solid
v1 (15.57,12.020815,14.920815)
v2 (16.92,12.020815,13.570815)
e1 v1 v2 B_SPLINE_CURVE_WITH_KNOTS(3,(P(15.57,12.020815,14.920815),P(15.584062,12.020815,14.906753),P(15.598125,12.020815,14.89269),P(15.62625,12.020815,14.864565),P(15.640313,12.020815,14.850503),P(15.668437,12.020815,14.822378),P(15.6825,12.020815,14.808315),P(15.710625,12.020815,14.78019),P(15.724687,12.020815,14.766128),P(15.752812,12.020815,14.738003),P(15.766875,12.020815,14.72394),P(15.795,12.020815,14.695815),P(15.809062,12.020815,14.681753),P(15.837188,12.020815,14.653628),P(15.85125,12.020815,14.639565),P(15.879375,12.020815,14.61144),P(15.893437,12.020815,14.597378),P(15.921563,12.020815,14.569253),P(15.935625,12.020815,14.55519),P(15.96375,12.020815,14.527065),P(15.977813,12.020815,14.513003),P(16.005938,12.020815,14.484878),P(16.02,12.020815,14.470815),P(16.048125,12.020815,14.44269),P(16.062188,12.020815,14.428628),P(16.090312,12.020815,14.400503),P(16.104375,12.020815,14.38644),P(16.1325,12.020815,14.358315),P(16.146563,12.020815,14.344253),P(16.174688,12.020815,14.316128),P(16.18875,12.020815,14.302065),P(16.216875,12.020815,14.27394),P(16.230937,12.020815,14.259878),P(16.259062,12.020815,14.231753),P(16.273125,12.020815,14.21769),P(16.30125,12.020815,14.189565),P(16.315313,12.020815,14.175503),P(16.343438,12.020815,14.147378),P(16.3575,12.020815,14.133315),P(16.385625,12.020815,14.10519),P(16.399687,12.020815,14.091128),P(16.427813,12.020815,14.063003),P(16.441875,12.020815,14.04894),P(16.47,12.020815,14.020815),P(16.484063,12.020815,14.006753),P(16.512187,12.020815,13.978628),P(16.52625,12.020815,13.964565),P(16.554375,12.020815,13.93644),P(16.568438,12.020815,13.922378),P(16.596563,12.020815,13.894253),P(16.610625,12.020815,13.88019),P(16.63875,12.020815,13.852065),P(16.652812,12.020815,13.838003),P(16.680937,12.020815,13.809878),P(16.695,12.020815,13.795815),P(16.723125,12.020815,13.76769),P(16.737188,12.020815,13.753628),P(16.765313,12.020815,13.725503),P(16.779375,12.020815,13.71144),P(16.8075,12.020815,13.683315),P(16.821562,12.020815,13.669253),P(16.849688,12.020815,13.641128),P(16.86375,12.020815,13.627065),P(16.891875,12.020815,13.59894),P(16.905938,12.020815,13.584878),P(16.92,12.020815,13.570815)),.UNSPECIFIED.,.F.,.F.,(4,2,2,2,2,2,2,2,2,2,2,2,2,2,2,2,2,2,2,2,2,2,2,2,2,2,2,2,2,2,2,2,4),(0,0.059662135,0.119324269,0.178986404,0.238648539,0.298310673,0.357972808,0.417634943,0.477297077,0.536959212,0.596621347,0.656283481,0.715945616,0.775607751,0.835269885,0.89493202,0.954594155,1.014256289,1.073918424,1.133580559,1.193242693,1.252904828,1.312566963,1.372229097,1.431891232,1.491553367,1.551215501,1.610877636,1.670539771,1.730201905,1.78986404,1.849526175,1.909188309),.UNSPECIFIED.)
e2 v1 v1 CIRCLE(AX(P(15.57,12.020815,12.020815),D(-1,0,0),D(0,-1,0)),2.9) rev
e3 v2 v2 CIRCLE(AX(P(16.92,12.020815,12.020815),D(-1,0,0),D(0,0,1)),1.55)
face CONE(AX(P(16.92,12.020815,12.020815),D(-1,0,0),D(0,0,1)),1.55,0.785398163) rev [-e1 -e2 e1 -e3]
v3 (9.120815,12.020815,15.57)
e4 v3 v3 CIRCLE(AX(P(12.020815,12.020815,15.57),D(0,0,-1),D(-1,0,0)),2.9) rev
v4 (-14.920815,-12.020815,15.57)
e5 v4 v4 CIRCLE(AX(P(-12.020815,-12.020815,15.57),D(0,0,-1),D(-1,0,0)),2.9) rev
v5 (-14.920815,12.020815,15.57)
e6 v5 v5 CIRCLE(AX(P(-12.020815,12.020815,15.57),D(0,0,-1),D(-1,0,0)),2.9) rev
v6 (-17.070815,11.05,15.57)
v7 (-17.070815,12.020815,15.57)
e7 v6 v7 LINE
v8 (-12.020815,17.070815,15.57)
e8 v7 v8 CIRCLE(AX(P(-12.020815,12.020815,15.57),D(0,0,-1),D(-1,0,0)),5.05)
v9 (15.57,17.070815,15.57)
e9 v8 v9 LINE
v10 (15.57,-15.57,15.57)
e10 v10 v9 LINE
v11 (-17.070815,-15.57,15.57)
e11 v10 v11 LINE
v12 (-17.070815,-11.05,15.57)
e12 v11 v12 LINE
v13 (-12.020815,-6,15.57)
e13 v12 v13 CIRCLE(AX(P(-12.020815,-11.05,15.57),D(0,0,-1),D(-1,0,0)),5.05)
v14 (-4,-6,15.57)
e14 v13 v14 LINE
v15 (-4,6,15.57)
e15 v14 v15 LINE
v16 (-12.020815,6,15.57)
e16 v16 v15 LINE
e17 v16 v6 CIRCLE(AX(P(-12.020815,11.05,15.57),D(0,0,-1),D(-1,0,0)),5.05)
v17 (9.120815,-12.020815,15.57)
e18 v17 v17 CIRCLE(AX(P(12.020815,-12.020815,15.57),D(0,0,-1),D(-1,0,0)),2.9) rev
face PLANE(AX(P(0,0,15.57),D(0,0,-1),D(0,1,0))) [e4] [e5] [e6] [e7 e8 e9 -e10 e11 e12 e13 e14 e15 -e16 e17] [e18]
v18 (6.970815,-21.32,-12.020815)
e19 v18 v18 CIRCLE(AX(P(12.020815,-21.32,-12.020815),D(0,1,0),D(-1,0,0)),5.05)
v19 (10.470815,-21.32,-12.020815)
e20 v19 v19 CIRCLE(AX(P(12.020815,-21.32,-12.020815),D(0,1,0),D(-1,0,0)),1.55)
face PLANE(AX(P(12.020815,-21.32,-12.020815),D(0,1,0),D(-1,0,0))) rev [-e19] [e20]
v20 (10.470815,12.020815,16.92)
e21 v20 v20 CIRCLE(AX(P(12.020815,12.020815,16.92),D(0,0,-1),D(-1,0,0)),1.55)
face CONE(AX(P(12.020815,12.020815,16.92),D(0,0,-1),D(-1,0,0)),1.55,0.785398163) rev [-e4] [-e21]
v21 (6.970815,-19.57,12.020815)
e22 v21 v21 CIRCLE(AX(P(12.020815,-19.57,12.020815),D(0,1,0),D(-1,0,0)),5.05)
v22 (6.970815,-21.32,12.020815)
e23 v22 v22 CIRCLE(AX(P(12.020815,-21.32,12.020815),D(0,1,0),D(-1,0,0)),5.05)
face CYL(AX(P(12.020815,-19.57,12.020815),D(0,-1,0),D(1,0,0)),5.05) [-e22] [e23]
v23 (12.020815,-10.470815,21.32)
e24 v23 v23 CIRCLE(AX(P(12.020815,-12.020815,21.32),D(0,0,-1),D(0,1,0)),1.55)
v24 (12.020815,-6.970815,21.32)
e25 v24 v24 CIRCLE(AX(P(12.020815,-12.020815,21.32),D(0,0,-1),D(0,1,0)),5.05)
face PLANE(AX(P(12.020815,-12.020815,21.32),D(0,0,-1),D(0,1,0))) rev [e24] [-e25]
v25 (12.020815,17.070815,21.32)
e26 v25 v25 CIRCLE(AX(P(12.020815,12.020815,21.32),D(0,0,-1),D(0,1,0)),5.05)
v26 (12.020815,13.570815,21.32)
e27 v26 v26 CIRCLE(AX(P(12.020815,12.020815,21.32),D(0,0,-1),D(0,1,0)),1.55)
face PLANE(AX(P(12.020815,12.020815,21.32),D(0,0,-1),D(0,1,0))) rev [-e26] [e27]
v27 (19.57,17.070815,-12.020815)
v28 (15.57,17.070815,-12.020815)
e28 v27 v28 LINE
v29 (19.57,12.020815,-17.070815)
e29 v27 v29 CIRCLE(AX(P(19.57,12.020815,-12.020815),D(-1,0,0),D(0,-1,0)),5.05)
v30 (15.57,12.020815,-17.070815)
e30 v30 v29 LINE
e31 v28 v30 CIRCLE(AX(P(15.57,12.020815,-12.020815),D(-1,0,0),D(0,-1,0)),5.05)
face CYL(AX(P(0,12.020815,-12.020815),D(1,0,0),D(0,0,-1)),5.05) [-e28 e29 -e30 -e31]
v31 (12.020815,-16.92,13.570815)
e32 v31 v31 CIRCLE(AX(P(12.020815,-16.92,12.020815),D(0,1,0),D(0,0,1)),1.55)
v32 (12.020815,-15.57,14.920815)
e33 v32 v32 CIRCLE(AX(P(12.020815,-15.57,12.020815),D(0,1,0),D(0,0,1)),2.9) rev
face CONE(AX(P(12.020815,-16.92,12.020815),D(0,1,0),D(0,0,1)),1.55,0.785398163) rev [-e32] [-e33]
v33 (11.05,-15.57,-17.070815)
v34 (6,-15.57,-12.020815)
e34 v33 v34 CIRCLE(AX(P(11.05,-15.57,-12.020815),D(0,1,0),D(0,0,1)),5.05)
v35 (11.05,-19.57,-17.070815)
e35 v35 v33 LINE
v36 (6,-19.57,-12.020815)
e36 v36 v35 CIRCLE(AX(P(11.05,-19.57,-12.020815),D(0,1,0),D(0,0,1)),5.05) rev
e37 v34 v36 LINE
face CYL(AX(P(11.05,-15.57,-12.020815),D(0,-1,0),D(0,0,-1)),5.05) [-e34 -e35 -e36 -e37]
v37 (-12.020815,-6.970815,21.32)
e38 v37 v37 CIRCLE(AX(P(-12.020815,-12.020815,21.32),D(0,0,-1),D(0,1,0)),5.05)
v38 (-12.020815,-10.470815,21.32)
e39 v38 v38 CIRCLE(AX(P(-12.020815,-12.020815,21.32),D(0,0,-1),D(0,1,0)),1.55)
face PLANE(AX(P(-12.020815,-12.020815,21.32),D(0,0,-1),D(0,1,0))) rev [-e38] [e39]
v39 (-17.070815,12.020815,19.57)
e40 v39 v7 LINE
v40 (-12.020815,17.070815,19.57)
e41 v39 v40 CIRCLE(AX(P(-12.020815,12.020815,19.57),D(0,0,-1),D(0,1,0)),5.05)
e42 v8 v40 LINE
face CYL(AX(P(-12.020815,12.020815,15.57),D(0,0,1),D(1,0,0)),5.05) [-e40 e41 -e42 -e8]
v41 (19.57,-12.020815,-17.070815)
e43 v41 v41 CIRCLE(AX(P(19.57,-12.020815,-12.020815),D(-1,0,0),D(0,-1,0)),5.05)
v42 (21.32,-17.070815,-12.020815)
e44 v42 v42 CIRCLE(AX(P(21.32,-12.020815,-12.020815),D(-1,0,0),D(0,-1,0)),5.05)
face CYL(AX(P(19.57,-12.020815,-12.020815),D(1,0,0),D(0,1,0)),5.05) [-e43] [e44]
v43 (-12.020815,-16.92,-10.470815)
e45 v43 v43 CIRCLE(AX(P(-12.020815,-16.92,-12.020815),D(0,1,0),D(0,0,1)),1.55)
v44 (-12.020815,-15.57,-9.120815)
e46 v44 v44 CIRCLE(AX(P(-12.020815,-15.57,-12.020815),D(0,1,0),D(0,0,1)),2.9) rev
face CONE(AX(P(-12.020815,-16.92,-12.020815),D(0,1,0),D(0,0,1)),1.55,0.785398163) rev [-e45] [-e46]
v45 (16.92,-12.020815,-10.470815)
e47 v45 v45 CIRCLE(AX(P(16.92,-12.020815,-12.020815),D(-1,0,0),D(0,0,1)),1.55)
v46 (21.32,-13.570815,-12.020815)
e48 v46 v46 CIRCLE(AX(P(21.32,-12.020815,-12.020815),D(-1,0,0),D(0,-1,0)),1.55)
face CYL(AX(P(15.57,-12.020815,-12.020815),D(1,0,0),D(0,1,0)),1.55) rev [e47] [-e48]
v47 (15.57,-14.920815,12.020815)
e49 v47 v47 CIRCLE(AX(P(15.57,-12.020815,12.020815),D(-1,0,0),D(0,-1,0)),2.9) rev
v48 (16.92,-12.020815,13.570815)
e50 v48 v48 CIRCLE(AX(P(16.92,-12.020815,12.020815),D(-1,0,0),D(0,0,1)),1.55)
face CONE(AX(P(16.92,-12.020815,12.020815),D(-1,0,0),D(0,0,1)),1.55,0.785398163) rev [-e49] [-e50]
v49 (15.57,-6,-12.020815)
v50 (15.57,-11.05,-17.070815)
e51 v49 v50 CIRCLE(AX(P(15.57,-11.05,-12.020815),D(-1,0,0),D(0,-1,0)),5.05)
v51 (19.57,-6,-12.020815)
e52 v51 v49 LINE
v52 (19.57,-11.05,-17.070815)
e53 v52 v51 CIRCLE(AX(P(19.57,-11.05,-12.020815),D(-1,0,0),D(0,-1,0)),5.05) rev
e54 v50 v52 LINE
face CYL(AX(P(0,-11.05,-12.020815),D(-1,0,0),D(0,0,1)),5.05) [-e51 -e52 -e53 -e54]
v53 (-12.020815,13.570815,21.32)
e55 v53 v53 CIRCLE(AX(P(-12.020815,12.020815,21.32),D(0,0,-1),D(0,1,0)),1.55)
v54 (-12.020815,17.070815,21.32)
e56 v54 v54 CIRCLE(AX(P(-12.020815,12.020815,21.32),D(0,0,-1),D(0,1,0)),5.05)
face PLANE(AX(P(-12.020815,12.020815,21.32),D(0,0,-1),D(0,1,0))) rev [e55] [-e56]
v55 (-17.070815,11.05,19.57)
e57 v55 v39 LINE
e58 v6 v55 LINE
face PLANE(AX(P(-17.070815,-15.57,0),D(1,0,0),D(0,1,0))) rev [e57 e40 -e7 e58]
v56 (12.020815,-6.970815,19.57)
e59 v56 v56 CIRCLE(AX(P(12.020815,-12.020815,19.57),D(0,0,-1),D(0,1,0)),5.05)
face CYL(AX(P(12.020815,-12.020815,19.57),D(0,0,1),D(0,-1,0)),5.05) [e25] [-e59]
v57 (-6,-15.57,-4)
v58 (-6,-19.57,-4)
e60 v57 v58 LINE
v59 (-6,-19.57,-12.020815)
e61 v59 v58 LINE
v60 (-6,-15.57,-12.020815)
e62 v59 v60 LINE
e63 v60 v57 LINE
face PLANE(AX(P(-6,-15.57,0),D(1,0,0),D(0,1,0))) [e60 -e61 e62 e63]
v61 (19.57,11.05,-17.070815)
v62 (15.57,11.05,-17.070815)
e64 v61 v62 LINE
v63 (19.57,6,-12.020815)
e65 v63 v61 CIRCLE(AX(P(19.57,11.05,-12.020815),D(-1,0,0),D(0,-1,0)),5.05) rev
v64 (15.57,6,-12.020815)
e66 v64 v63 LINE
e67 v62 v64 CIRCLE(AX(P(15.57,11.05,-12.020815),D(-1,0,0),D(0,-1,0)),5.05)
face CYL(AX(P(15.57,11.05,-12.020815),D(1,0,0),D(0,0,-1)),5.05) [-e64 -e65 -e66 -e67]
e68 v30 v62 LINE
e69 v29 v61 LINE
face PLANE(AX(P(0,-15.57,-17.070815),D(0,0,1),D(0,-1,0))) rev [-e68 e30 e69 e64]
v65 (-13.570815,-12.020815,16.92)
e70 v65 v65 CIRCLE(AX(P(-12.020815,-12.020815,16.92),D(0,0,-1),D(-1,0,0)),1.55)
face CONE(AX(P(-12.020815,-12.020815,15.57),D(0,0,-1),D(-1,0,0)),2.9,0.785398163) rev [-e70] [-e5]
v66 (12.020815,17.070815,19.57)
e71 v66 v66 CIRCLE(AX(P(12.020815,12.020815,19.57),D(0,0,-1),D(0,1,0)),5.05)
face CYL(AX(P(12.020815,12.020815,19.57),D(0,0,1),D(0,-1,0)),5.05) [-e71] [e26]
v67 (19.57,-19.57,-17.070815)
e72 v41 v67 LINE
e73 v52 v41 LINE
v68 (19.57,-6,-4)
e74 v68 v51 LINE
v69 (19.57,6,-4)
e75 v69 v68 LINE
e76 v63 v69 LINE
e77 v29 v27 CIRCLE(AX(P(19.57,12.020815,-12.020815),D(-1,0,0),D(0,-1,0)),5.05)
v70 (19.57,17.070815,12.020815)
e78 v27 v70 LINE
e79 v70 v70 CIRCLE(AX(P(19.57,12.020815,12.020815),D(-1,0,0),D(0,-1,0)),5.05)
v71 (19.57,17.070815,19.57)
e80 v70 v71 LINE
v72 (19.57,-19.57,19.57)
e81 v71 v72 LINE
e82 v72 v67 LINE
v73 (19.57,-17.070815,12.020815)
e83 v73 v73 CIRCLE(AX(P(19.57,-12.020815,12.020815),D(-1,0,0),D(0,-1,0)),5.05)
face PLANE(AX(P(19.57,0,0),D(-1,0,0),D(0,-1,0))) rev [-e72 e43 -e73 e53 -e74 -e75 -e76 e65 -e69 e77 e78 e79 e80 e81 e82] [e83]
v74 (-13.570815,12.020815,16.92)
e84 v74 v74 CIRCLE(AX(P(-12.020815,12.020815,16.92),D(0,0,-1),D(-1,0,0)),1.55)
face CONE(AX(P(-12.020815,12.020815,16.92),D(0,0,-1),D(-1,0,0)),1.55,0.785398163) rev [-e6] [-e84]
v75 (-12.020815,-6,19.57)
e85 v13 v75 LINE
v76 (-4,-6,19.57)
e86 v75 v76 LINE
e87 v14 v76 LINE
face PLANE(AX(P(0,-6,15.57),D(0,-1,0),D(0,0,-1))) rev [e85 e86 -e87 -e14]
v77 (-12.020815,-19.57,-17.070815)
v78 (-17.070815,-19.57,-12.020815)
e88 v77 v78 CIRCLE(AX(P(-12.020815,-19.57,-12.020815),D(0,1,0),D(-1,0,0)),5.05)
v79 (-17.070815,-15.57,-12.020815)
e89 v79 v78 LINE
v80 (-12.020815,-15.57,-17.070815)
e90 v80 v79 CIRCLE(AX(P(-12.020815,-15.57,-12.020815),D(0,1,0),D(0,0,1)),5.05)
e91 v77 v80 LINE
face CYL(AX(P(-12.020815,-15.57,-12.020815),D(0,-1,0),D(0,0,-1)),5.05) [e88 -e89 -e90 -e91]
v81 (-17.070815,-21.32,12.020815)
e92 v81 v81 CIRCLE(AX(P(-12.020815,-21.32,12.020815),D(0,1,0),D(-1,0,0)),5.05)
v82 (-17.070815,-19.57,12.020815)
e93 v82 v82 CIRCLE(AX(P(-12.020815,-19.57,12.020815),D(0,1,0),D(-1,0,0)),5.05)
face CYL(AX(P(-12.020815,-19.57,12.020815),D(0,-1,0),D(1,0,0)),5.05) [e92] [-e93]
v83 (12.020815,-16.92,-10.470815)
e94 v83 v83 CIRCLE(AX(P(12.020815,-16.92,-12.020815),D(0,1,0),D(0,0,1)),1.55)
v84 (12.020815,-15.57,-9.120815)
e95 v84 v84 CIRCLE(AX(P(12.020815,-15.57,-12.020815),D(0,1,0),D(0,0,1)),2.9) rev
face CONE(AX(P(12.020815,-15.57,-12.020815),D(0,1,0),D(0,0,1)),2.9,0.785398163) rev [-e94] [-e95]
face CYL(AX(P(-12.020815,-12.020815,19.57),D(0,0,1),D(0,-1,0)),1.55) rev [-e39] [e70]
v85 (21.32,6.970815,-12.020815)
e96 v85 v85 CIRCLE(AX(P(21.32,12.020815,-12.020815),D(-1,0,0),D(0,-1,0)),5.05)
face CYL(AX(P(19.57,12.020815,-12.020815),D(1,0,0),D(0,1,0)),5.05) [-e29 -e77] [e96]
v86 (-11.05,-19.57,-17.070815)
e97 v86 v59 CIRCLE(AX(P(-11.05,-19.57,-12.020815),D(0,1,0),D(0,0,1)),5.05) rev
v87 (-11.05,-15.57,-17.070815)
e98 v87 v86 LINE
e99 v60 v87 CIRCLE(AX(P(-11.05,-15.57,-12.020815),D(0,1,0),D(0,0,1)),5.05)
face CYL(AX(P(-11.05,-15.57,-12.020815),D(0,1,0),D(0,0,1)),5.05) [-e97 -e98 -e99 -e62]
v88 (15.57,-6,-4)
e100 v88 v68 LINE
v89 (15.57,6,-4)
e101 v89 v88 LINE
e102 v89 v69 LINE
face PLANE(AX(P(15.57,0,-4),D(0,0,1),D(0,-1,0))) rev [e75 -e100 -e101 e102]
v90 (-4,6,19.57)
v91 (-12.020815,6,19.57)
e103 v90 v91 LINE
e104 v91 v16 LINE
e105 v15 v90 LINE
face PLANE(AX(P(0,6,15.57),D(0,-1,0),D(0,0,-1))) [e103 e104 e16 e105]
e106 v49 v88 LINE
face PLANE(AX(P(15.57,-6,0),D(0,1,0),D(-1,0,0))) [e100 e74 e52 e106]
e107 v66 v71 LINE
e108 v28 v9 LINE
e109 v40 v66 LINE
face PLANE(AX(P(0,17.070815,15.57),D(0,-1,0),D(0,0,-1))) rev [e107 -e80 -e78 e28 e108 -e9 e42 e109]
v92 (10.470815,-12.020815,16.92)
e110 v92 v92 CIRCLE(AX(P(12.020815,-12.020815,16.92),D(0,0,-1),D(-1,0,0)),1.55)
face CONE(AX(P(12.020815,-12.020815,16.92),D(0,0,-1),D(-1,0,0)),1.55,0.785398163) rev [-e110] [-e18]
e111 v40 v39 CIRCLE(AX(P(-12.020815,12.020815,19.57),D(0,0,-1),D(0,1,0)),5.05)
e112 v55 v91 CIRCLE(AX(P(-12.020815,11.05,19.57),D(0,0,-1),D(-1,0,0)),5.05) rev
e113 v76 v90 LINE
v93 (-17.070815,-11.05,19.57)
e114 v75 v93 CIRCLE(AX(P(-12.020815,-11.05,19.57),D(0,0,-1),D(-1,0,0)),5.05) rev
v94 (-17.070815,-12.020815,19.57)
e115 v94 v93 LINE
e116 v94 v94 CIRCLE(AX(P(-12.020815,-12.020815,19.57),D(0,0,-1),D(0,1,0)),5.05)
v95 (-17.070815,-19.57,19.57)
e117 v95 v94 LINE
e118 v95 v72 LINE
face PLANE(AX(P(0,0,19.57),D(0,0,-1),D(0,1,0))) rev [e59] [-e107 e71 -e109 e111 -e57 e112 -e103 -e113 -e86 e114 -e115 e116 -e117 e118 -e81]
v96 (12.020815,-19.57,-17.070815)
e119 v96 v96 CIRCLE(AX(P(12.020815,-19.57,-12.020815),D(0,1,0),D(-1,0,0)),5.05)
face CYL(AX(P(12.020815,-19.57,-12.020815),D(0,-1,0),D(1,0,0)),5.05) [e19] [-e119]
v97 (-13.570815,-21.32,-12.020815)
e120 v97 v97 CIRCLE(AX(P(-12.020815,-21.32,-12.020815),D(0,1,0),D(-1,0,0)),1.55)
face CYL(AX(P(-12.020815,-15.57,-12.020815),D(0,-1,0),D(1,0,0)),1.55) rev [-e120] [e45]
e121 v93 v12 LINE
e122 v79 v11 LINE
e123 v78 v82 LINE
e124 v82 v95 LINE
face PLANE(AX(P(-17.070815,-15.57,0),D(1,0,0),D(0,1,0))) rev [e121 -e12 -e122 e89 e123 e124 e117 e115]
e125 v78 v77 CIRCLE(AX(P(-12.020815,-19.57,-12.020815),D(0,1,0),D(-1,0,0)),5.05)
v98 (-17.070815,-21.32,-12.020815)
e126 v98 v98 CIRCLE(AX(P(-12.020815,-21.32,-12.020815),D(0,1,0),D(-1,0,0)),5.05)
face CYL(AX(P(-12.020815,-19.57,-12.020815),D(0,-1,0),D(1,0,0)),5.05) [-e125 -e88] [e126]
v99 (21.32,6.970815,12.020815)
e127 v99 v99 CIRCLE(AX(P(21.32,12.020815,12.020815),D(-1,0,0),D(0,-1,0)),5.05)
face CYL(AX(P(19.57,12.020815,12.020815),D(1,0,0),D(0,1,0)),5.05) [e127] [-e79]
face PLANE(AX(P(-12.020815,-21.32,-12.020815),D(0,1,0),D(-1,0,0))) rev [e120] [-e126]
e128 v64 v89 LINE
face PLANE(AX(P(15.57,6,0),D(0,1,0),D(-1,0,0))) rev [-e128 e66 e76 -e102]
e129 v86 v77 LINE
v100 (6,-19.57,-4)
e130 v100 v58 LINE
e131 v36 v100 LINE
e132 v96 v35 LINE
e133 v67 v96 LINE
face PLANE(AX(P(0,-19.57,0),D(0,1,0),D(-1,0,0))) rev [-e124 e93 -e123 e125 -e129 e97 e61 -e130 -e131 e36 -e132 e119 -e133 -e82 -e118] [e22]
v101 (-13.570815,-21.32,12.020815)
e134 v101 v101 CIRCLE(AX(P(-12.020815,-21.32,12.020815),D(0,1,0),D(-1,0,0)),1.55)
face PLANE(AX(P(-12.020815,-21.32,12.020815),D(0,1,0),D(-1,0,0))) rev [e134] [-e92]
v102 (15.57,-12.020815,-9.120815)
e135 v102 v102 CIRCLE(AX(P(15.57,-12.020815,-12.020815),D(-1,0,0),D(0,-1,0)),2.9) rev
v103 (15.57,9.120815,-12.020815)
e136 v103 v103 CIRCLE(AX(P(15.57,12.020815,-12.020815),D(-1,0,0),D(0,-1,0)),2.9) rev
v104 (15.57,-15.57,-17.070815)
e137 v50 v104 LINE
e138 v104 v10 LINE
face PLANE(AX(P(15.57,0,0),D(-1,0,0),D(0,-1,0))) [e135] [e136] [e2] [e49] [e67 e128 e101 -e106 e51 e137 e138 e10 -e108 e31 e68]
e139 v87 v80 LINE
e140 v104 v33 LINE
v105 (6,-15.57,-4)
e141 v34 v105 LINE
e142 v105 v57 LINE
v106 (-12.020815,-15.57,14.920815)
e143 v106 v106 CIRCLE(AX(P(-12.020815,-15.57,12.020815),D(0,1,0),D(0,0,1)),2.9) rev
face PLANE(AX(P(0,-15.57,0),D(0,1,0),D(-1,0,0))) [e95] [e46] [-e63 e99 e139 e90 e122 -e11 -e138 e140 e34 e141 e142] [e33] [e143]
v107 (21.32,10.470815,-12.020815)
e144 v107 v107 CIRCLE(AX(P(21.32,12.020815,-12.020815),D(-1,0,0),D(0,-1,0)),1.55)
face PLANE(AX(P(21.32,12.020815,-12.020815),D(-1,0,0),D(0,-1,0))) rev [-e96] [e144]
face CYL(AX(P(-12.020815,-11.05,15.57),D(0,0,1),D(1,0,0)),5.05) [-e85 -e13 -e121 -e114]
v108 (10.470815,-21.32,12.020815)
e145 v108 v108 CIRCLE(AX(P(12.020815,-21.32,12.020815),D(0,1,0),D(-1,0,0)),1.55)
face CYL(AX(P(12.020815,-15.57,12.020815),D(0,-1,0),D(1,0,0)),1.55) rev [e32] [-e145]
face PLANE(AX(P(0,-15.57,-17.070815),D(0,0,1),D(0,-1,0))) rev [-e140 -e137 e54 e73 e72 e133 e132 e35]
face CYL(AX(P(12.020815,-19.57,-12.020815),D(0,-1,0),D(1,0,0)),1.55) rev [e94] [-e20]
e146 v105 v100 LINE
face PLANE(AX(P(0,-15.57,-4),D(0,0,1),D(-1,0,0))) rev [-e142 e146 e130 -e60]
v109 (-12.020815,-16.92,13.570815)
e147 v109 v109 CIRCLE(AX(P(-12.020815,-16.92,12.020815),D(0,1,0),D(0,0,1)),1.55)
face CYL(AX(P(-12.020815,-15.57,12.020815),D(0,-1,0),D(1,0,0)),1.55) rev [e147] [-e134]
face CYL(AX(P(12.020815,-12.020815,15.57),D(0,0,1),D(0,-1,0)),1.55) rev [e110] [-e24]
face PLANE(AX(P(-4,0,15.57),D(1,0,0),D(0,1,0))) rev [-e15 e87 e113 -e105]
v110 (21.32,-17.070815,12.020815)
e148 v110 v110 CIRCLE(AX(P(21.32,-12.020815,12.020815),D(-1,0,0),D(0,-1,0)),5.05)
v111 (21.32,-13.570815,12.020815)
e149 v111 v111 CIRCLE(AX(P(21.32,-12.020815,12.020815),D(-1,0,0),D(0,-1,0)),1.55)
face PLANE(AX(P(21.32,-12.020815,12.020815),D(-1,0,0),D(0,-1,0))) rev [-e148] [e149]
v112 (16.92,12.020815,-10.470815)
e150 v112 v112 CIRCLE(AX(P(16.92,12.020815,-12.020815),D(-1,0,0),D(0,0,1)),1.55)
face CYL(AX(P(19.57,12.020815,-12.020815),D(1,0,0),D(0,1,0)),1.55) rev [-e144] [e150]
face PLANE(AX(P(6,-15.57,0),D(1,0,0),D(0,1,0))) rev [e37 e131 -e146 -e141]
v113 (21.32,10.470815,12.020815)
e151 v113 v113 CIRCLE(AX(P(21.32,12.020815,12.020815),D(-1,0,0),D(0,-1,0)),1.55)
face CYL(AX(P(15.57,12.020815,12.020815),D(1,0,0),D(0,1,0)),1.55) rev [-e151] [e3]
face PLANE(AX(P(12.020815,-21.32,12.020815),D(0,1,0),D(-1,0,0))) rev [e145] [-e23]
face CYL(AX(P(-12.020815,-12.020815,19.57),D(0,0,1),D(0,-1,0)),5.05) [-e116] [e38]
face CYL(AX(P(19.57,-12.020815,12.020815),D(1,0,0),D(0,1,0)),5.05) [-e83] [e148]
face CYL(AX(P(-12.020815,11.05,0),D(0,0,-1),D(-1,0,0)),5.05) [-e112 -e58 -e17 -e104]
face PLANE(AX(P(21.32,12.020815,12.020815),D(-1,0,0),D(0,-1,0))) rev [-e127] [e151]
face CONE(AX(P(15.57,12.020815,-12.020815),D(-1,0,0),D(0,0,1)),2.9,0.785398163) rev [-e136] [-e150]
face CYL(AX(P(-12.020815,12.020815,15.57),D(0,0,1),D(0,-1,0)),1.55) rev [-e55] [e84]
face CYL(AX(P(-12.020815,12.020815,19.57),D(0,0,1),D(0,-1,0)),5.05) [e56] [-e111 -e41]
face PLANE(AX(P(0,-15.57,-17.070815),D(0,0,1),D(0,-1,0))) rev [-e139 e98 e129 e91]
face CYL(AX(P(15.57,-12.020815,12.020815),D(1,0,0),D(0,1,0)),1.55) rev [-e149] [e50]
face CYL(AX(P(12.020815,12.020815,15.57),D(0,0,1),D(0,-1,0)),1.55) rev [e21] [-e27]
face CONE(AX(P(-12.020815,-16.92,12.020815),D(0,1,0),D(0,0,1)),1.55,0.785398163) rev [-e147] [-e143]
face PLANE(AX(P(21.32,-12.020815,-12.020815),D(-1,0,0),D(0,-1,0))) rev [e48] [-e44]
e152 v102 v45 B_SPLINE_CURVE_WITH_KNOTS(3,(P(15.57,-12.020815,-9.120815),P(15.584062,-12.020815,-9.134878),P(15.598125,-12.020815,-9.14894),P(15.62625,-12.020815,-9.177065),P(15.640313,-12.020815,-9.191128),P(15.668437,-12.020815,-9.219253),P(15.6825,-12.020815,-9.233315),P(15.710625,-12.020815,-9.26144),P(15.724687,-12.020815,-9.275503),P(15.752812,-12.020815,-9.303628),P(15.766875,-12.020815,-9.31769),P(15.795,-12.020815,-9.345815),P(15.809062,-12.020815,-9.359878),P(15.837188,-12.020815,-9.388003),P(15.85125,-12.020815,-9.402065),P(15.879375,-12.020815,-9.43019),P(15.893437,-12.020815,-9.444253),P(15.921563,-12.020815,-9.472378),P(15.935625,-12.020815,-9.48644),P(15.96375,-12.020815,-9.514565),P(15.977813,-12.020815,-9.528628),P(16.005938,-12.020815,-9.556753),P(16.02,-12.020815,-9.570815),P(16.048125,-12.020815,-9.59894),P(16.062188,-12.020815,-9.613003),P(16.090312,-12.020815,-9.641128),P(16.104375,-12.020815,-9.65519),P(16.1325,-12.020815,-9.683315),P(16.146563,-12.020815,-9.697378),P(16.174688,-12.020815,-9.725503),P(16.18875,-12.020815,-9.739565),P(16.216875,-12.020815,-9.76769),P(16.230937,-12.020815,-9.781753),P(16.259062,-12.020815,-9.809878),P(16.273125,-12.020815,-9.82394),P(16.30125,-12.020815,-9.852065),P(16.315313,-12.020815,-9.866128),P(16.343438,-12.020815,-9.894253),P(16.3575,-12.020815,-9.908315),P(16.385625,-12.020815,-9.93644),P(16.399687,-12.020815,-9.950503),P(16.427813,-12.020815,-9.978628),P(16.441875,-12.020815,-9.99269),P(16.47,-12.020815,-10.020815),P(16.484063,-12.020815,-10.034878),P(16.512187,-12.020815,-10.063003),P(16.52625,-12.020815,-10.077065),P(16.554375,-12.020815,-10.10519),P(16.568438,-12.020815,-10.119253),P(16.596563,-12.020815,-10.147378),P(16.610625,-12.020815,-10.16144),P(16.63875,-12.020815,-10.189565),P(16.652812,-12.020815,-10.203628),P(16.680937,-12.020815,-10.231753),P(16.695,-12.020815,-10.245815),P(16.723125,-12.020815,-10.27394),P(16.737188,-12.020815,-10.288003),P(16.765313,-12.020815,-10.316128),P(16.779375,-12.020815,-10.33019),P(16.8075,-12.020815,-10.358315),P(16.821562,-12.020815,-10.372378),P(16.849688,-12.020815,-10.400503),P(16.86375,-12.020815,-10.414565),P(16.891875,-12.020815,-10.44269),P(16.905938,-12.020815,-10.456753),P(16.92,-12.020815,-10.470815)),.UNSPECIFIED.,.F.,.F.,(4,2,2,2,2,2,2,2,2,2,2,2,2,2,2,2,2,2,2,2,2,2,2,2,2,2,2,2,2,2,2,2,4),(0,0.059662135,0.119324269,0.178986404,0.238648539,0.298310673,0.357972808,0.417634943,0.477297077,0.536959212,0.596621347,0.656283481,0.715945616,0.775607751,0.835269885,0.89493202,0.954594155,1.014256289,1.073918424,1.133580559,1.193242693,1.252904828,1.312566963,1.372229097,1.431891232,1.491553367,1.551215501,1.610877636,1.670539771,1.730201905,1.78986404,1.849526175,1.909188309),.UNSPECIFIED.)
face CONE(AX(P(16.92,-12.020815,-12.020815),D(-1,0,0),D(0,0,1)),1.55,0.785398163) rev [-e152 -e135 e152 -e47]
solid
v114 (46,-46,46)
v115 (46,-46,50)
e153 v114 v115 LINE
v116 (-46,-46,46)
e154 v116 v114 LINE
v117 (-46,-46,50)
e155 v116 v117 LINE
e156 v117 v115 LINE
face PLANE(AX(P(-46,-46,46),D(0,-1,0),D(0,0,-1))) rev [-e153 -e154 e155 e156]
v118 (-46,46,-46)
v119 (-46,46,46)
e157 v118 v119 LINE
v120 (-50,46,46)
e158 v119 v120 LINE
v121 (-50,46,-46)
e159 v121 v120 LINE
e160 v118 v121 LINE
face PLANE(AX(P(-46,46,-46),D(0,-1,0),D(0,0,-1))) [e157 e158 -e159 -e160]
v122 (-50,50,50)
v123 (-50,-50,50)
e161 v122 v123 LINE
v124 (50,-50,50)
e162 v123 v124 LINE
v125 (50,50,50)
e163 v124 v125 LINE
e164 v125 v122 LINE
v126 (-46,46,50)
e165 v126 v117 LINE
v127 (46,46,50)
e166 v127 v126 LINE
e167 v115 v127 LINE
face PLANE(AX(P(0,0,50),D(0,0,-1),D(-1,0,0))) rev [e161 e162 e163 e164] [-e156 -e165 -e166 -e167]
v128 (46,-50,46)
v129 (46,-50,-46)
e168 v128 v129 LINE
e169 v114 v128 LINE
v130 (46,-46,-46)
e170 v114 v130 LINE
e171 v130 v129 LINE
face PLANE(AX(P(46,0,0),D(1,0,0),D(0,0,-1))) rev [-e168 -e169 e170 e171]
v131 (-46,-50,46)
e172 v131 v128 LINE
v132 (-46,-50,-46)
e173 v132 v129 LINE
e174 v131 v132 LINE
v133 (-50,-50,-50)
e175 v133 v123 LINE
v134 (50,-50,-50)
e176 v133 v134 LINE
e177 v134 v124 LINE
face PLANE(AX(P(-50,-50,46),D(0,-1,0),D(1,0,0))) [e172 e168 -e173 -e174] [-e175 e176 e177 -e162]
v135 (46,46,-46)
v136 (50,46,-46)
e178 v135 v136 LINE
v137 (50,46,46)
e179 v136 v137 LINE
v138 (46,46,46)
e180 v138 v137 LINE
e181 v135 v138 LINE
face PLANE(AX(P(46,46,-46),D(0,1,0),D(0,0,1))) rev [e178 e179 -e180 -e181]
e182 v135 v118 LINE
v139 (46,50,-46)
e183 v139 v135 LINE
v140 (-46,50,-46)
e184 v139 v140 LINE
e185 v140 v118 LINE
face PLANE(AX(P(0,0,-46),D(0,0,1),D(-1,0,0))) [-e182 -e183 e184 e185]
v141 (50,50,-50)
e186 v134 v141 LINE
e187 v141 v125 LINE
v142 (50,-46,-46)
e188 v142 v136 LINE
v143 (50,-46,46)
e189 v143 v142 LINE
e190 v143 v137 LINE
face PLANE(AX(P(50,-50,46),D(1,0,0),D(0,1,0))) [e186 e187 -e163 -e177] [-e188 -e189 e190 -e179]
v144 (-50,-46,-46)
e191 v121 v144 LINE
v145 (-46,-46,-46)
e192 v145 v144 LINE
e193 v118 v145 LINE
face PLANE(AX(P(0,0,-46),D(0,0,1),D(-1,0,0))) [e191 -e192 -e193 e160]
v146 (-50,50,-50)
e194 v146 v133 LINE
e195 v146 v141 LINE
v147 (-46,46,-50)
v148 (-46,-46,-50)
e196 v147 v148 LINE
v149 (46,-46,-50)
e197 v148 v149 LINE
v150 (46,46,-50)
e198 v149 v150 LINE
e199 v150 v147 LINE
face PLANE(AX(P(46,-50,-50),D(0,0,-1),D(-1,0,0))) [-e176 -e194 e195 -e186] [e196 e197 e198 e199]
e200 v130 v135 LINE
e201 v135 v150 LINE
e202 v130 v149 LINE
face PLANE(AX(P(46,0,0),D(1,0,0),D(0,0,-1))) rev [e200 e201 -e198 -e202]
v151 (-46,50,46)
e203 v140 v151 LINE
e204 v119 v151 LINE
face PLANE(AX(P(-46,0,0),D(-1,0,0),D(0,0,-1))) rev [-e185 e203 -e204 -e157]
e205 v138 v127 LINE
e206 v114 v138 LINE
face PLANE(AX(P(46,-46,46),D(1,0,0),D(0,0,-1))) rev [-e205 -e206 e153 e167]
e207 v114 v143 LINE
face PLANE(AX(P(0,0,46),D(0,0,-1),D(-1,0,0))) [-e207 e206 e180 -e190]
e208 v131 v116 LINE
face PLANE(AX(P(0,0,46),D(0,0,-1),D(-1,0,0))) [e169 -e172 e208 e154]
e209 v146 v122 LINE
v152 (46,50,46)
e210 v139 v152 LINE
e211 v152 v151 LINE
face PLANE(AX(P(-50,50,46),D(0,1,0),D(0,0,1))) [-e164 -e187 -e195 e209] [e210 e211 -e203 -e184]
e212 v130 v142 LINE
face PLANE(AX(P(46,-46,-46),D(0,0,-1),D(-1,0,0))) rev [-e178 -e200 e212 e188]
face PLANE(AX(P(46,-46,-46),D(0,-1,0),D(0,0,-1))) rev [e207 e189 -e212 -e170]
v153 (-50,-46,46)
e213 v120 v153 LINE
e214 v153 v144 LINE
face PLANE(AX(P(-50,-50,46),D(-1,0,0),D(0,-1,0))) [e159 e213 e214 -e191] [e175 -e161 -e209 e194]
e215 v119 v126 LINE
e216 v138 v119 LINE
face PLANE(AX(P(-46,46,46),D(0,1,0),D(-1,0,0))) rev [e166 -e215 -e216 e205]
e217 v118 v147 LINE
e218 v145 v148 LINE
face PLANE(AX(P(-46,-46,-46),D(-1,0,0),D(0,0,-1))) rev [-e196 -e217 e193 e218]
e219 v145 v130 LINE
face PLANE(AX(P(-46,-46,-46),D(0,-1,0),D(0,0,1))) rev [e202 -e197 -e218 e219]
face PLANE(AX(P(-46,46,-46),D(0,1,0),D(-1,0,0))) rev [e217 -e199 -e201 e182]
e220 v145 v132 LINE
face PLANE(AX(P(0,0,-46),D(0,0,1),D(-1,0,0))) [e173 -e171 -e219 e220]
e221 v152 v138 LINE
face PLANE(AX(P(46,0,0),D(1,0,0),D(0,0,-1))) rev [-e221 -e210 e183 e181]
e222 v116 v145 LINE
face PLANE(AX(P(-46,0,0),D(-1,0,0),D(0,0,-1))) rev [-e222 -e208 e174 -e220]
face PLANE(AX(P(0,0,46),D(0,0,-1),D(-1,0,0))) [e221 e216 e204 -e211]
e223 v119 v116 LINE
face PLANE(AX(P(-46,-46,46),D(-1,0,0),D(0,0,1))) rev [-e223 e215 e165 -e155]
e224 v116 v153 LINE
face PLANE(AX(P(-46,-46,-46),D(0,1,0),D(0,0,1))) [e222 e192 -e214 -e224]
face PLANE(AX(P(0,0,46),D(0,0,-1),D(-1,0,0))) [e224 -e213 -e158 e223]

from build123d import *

# Parameters (mm, degrees)
SKETCH1_W              = 100
SKETCH1_H              = 100
SKETCH1_W_2            = 92
SKETCH1_H_2            = 92
BOSS_EXTRUDE1_DEPTH    = 4
SKETCH9_W              = 100
SKETCH9_H              = 100
SKETCH9_W_2            = 92
SKETCH9_H_2            = 92
BOSS_EXTRUDE2_DEPTH    = 4
SKETCH10_W             = 100
SKETCH10_H             = 100
SKETCH10_W_2           = 92
SKETCH10_H_2           = 92
BOSS_EXTRUDE3_DEPTH    = 4
SKETCH11_R             = 5.05
SKETCH11_R_2           = 1.55
BOSS_EXTRUDE13_DEPTH   = 1.75
BOSS_EXTRUDE13_2_DEPTH = 1.75
BOSS_EXTRUDE13_3_DEPTH = 1.75
BOSS_EXTRUDE13_4_DEPTH = 1.75
SKETCH12_R             = 1.55
BOSS_EXTRUDE6_DEPTH    = 4
BODY_MOVE_COPY1_ANGLE  = 180
BODY_MOVE_COPY3_ANGLE  = 120
BOSS_EXTRUDE7_DEPTH    = 36.64081528
CUT_EXTRUDE1_START     = -4
SKETCH18_R             = 1.55
SKETCH18_W             = 13.07081528
SKETCH18_H             = 12
CUT_EXTRUDE1_DEPTH     = 2.499185
CUT_EXTRUDE2_START     = -4
SKETCH19_R             = 1.55
SKETCH19_W             = 13.07081528
SKETCH19_H             = 12
CUT_EXTRUDE2_DEPTH     = 2.499185
FILLET2_R              = 5.05
CHAMFER1_SIZE          = 1.35


with BuildPart() as part:
    # Sketch1 → Boss-Extrude1 (new body)
    with BuildSketch(Plane.XY.offset(50)):
        Rectangle(SKETCH1_W, SKETCH1_H)
        Rectangle(SKETCH1_W_2, SKETCH1_H_2, mode=Mode.SUBTRACT)
    extrude(amount=-BOSS_EXTRUDE1_DEPTH)


with BuildPart() as body_2:
    # Mirror2: mirrored copy
    add(part.part.mirror(Plane.XY))


with BuildPart() as part_1:
    add(part.part)

    add(body_2.part)  # Boss-Extrude2 merges body 2
    # Sketch9 → Boss-Extrude2 (add)
    with BuildSketch(Plane(origin=(50, 0, 0), x_dir=(0, 0, -1), z_dir=(1, 0, 0))):
        Rectangle(SKETCH9_W, SKETCH9_H)
        Rectangle(SKETCH9_W_2, SKETCH9_H_2, mode=Mode.SUBTRACT)
    boss_extrude2 = extrude(amount=-BOSS_EXTRUDE2_DEPTH)

    # Mirror3: Boss-Extrude2 across plane
    add(boss_extrude2.mirror(Plane(origin=(0, 0, 0), x_dir=(0, 0, 1), z_dir=(1, 0, 0))))

    # Sketch10 → Boss-Extrude3 (add)
    with BuildSketch(Plane(origin=(0, 50, 0), x_dir=(1, 0, 0), z_dir=(0, 1, 0))):
        Rectangle(SKETCH10_W, SKETCH10_H)
        Rectangle(SKETCH10_W_2, SKETCH10_H_2, mode=Mode.SUBTRACT)
    boss_extrude3 = extrude(amount=-BOSS_EXTRUDE3_DEPTH)

    # Mirror4: Boss-Extrude3 across plane
    add(boss_extrude3.mirror(Plane.ZX))


with BuildPart() as body_2_2:
    # Sketch11 → Boss-Extrude13 (new body)
    with BuildSketch(Plane.ZY.offset(-21.32)):
        with Locations(Location((-12.02081528, 12.02081528, 0), (0, 0, 270))):
            Circle(SKETCH11_R)
        with Locations(Location((-12.02081528, 12.02081528, 0), (0, 0, 270))):
            Circle(SKETCH11_R_2, mode=Mode.SUBTRACT)
    extrude(amount=BOSS_EXTRUDE13_DEPTH)



with BuildPart() as body_3:
    # Sketch11 → Boss-Extrude13 2 (new body)
    with BuildSketch(Plane.ZY.offset(-21.32)):
        with Locations(Location((12.02081528, 12.02081528, 0), (0, 0, 270))):
            Circle(SKETCH11_R)
        with Locations(Location((12.02081528, 12.02081528, 0), (0, 0, 270))):
            Circle(SKETCH11_R_2, mode=Mode.SUBTRACT)
    extrude(amount=BOSS_EXTRUDE13_2_DEPTH)


with BuildPart() as body_4:
    # Sketch11 → Boss-Extrude13 3 (new body)
    with BuildSketch(Plane.ZY.offset(-21.32)):
        with Locations(Location((12.02081528, -12.02081528, 0), (0, 0, 270))):
            Circle(SKETCH11_R)
        with Locations(Location((12.02081528, -12.02081528, 0), (0, 0, 270))):
            Circle(SKETCH11_R_2, mode=Mode.SUBTRACT)
    extrude(amount=BOSS_EXTRUDE13_3_DEPTH)


with BuildPart() as body_5:
    # Sketch11 → Boss-Extrude13 4 (new body)
    with BuildSketch(Plane.ZY.offset(-21.32)):
        with Locations(Location((-12.02081528, -12.02081528, 0), (0, 0, 270))):
            Circle(SKETCH11_R)
        with Locations(Location((-12.02081528, -12.02081528, 0), (0, 0, 270))):
            Circle(SKETCH11_R_2, mode=Mode.SUBTRACT)
    extrude(amount=BOSS_EXTRUDE13_4_DEPTH)


with BuildPart() as body_2_2_1:
    add(body_2_2.part)

    add(body_3.part)  # Boss-Extrude6 merges body 3

    add(body_4.part)  # Boss-Extrude6 merges body 4

    add(body_5.part)  # Boss-Extrude6 merges body 5
    # Sketch12 → Boss-Extrude6 (add)
    with BuildSketch(Plane.ZY.offset(-19.57)):
        Polygon((17.07081528, -17.07081528), (17.07081528, 17.07081528), (-17.07081528, 17.07081528), (-17.07081528, 6), (-4, 6), (-4, -6), (-17.07081528, -6), (-17.07081528, -17.07081528), align=None)
        with Locations(Location((-12.02081528, -12.02081528, 0), (0, 0, 270))):
            Circle(SKETCH12_R, mode=Mode.SUBTRACT)
        with Locations(Location((12.02081528, -12.02081528, 0), (0, 0, 270))):
            Circle(SKETCH12_R, mode=Mode.SUBTRACT)
        with Locations(Location((12.02081528, 12.02081528, 0), (0, 0, 270))):
            Circle(SKETCH12_R, mode=Mode.SUBTRACT)
        with Locations(Location((-12.02081528, 12.02081528, 0), (0, 0, 270))):
            Circle(SKETCH12_R, mode=Mode.SUBTRACT)
    extrude(amount=BOSS_EXTRUDE6_DEPTH)


with BuildPart() as body_3_2:
    # Body-Move/Copy1: copy of body 2 2
    add(body_2_2_1.part.moved(Location((0, 0, 0))).rotate(Axis((9.285, 0, -9.285), (0.7071067811865488, 0, 0.7071067811865462)), BODY_MOVE_COPY1_ANGLE))


with BuildPart() as body_3_2_1:
    # Body-Move/Copy2: moved
    add(body_3_2.part.moved(Location((-18.57, 0, 18.57))))


with BuildPart() as body_4_2:
    # Body-Move/Copy3: copy of body 3 2
    add(body_3_2_1.part.moved(Location((0, 0, 0))).rotate(Axis((-6.19, 6.19, 12.38), (0.5773502691896252, -0.5773502691896252, 0.5773502691896272)), BODY_MOVE_COPY3_ANGLE))


with BuildPart() as body_4_2_1:
    # Body-Move/Copy4: moved
    add(body_4_2.part.moved(Location((0, -18.57, -18.57))))

    # Combine1: union body 3 2, body 2 2
    add(body_3_2_1.part)
    add(body_2_2_1.part)

    # Sketch13 → Boss-Extrude7 (add)
    with BuildSketch(Plane.XZ.offset(19.57)):
        Polygon((19.57, 19.57), (-17.07081528, 19.57), (-17.07081528, 17.07081528), (17.07081528, 17.07081528), (17.07081528, -17.07081528), (19.57, -17.07081528), (19.57, 17.07081528), align=None)
    extrude(amount=-BOSS_EXTRUDE7_DEPTH)

    # Sketch18 → Cut-Extrude1 (cut)
    with BuildSketch(Plane(origin=(0, 0, 15.57), x_dir=(-1, 0, 0), z_dir=(0, 0, -1)).offset(CUT_EXTRUDE1_START)):
        with Locations(Location((-12.02081528, 12.02081528, 0), (0, 0, 90))):
            Circle(SKETCH18_R)
        with Locations(Location((12.02081528, 12.02081528, 0), (0, 0, 90))):
            Circle(SKETCH18_R)
        with Locations(Location((12.02081528, -12.02081528, 0), (0, 0, 90))):
            Circle(SKETCH18_R)
        with Locations(Location((-12.02081528, -12.02081528, 0), (0, 0, 90))):
            Circle(SKETCH18_R)
        with Locations((10.53540764, 0)):
            Rectangle(SKETCH18_W, SKETCH18_H)
    extrude(amount=CUT_EXTRUDE1_DEPTH, mode=Mode.SUBTRACT)

    # Sketch19 → Cut-Extrude2 (cut)
    with BuildSketch(Plane.ZY.offset(-15.57).offset(CUT_EXTRUDE2_START)):
        with Locations(Location((-12.02081528, 12.02081528, 0), (0, 0, 270))):
            Circle(SKETCH19_R)
        with Locations(Location((12.02081528, 12.02081528, 0), (0, 0, 270))):
            Circle(SKETCH19_R)
        with Locations(Location((12.02081528, -12.02081528, 0), (0, 0, 270))):
            Circle(SKETCH19_R)
        with Locations(Location((-12.02081528, -12.02081528, 0), (0, 0, 270))):
            Circle(SKETCH19_R)
        with Locations((-10.53540764, 0)):
            Rectangle(SKETCH19_W, SKETCH19_H)
    extrude(amount=CUT_EXTRUDE2_DEPTH, mode=Mode.SUBTRACT)

    # Fillet2
    fillet2_edges = [body_4_2_1.edges().sort_by_distance(p)[0] for p in [
        (17.57, -6, -17.07081528),
        (-17.07081528, 6, 17.57),
        (-17.07081528, 17.07081528, 17.57),
        (-17.07081528, -6, 17.57),
        (17.57, 17.07081528, -17.07081528),
        (17.57, 6, -17.07081528),
        (-6, -17.57, -17.07081528),
        (-17.07081528, -17.57, -17.07081528),
        (6, -17.57, -17.07081528),
    ]]
    fillet(fillet2_edges, radius=FILLET2_R - 0.0001)  # a hair under: the kernel refuses the full size

    # Chamfer1
    chamfer1_edges = [body_4_2_1.edges().sort_by_distance(p)[0] for p in [
        (-12.02081528, 10.47081528, 15.57),
        (12.02081528, 10.47081528, 15.57),
        (12.02081528, -13.57081528, 15.57),
        (-12.02081528, -13.57081528, 15.57),
        (15.57, -10.47081528, -12.02081528),
        (15.57, -10.47081528, 12.02081528),
        (15.57, 13.57081528, 12.02081528),
        (15.57, 13.57081528, -12.02081528),
        (-10.47081528, -15.57, -12.02081528),
        (-10.47081528, -15.57, 12.02081528),
        (13.57081528, -15.57, 12.02081528),
        (13.57081528, -15.57, -12.02081528),
    ]]
    chamfer(chamfer1_edges, length=CHAMFER1_SIZE)


solid = Compound([part_1.part, body_4_2_1.part])
